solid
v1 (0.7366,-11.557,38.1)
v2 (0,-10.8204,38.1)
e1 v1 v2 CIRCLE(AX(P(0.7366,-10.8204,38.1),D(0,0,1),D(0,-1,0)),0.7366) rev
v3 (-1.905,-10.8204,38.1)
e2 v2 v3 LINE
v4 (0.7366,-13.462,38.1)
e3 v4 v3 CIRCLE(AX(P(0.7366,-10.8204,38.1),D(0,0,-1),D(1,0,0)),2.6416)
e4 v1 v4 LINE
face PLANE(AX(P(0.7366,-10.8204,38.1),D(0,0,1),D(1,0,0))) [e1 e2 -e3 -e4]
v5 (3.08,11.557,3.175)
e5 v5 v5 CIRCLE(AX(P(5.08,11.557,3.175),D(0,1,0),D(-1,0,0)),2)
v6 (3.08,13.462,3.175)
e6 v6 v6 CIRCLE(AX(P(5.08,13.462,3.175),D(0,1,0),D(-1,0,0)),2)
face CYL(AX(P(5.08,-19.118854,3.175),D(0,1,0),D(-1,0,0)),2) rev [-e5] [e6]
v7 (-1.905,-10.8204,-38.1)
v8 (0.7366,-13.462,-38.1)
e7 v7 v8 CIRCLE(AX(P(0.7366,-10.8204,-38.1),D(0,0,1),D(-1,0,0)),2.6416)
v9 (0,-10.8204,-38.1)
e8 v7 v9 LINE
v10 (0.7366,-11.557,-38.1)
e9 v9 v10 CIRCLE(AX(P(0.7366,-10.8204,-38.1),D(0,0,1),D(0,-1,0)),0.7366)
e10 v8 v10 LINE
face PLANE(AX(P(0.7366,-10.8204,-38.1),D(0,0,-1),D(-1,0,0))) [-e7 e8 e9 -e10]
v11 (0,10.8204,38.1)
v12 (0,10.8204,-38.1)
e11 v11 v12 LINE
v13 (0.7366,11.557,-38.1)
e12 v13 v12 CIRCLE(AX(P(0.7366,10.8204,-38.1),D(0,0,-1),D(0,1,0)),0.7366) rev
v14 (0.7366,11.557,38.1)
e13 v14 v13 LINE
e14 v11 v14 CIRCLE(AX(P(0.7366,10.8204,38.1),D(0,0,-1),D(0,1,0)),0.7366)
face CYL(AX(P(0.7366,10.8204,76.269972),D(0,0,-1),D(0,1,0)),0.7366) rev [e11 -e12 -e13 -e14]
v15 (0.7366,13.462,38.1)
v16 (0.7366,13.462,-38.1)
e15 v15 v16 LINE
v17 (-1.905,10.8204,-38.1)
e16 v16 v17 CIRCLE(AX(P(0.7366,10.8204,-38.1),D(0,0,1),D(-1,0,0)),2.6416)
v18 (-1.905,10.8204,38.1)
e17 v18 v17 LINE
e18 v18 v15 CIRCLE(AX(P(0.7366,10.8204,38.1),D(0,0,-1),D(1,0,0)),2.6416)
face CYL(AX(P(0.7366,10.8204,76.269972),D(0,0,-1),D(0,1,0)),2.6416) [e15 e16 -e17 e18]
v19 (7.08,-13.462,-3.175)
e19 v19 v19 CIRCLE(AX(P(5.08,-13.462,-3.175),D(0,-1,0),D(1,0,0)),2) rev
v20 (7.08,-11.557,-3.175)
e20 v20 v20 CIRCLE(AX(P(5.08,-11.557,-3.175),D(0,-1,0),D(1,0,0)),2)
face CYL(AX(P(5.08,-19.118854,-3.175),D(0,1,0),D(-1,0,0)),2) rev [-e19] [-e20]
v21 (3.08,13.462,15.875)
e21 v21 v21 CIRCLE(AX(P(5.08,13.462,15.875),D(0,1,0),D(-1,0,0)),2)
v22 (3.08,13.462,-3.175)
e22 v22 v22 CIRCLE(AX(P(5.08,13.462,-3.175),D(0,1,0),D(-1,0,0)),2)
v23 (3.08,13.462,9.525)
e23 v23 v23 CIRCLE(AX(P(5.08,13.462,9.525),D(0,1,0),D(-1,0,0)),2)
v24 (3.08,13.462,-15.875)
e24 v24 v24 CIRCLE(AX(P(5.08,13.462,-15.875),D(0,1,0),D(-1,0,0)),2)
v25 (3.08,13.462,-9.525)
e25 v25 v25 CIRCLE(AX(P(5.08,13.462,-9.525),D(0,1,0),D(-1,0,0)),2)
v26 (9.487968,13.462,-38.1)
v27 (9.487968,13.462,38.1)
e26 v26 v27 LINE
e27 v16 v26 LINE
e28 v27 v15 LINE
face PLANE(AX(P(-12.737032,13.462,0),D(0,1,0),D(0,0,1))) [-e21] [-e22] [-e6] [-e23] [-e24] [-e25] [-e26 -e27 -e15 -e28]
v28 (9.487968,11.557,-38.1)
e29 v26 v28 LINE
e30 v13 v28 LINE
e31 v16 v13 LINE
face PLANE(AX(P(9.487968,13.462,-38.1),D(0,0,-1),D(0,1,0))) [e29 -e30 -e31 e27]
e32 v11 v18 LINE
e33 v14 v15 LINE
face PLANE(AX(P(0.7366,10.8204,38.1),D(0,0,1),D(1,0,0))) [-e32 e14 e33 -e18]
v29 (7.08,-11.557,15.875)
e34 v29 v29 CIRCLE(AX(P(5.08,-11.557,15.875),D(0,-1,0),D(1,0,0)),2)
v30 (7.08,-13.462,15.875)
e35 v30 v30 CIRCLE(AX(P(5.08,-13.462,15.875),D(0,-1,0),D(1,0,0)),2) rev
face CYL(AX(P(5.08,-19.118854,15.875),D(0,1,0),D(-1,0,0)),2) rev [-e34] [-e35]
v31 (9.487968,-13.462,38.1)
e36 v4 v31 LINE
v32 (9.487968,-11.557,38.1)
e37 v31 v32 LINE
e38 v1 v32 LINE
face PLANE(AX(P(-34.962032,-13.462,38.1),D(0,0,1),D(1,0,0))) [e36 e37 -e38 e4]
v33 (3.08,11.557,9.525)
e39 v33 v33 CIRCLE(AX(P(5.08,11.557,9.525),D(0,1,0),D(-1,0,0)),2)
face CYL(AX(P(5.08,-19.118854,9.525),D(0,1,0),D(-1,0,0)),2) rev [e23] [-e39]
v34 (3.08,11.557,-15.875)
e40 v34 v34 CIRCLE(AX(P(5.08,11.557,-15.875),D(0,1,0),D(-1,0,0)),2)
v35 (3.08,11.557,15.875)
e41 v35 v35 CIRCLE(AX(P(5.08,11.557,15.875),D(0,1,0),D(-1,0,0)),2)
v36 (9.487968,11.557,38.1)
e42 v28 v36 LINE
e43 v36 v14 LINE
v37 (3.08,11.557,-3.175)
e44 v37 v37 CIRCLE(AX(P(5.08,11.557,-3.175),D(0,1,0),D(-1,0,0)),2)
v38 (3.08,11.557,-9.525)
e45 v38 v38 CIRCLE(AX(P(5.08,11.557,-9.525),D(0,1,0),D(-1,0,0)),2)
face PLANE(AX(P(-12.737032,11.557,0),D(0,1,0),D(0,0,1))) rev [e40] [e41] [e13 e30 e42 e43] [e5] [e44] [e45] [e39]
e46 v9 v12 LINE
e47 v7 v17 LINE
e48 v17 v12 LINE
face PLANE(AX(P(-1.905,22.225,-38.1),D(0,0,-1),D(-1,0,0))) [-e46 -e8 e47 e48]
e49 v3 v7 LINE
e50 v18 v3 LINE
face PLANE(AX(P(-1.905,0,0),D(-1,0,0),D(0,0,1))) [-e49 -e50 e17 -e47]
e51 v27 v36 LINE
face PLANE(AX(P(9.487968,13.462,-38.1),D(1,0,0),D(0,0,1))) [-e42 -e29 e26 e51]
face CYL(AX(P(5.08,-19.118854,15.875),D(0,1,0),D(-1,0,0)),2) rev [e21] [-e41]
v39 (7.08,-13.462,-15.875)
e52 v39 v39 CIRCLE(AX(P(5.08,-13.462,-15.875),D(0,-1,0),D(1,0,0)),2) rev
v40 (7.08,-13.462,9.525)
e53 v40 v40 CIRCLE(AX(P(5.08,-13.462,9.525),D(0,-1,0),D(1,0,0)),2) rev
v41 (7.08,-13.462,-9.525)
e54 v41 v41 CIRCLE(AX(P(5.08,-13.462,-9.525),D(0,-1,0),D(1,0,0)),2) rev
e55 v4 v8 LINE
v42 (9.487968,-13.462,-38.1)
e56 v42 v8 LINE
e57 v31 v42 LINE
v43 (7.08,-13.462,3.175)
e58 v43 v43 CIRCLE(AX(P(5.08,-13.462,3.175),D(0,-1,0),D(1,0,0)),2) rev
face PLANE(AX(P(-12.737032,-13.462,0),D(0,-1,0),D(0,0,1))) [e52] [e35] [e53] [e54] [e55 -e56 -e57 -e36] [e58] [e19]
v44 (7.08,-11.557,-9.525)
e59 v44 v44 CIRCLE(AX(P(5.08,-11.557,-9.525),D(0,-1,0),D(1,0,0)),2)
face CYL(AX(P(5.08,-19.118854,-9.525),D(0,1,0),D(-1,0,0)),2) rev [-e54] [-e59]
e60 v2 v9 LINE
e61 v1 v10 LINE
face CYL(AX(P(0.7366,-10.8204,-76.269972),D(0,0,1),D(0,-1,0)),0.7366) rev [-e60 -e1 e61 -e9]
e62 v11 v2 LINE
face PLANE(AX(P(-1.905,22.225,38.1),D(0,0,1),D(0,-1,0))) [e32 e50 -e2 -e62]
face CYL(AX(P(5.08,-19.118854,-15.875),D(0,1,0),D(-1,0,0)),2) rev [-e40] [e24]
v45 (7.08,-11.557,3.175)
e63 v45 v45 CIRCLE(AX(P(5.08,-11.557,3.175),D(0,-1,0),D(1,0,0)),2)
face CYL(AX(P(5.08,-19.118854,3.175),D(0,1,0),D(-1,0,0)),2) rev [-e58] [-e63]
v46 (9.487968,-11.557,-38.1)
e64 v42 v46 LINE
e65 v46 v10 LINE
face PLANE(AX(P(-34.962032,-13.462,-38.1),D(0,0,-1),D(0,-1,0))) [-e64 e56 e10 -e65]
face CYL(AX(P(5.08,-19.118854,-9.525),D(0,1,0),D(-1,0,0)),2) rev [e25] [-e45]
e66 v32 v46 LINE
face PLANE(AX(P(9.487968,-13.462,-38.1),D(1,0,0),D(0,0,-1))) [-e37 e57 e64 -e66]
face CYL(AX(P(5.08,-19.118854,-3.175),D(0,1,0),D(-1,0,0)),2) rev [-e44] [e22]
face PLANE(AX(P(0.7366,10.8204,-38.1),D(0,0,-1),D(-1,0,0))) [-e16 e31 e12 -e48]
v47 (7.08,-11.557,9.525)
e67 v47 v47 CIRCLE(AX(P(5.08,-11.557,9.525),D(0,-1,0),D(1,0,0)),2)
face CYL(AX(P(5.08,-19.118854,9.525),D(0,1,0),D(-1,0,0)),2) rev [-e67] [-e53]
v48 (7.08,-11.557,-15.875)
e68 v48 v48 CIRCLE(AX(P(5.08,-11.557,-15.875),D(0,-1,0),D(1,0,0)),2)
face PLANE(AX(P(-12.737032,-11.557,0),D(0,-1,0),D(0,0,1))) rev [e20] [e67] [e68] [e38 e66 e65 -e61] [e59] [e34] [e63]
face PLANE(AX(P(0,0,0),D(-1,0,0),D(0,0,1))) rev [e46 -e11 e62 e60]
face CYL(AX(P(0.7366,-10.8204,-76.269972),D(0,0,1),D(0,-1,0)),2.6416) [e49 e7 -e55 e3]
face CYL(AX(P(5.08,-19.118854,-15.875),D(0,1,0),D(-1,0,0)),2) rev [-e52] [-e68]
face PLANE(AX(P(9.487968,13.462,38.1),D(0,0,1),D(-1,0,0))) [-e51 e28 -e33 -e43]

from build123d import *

# Parameters (mm, degrees)
SKETCH4_W              = 76.2
SKETCH4_H              = 44.45
BASE_FLANGE1_DEPTH     = 1.905
SKETCHED_START         = -38.1
SKETCHED_BEND3_DEPTH   = 76.2
SKETCHED_BEND3_2_DEPTH = 76.2
CUT_EXTRUDE2_REACH     = 49.608
SKETCH20_R             = 2


# Read off the part's stored shape, not the designer's step: Sketched Bend3
# Sheet-metal steps are written as plain solids
with BuildPart() as part:
    # Sketch4 → Base-Flange1 (new body)
    with BuildSketch(Plane(origin=(0, 0, 0), x_dir=(0, 0, -1), z_dir=(1, 0, 0))):
        Rectangle(SKETCH4_W, SKETCH4_H)
    extrude(amount=-BASE_FLANGE1_DEPTH)

    # Sketched Bend3 outline → Sketched Bend3 (cut)
    with BuildSketch(Plane.XY.offset(SKETCHED_START)):
        with BuildLine():
            ThreePointArc((0, -13.357223013), (-1.375727285, -12.406629491), (-1.905, -10.8204))
            Line((-1.905, -10.8204), (-1.905, -22.225))
            Line((-1.905, -22.225), (0, -22.225))
            Line((0, -22.225), (0, -13.357223013))
        make_face()
        with BuildLine():
            Line((-1.905, 22.225), (-1.905, 10.8204))
            ThreePointArc((-1.905, 10.8204), (-1.375727285, 12.406629491), (0, 13.357223013))
            Line((0, 13.357223013), (0, 22.225))
            Line((0, 22.225), (-1.905, 22.225))
        make_face()
    extrude(amount=SKETCHED_BEND3_DEPTH, mode=Mode.SUBTRACT)

    # Sketched Bend3 2 outline → Sketched Bend3 2 (add)
    with BuildSketch(Plane.XY.offset(SKETCHED_START)):
        with BuildLine():
            Line((0, -10.8204), (0, -13.357223013))
            ThreePointArc((0, -13.357223013), (0.364592683, -13.435674577), (0.7366, -13.462))
            Line((0.7366, -13.462), (9.487967924, -13.462))
            Line((9.487967924, -13.462), (9.487967924, -11.557))
            Line((9.487967924, -11.557), (0.7366, -11.557))
            ThreePointArc((0.7366, -11.557), (0.215745145, -11.341254855), (0, -10.8204))
        make_face()
        with BuildLine():
            ThreePointArc((0.7366, 13.462), (0.364592683, 13.435674577), (0, 13.357223013))
            Line((0, 13.357223013), (0, 10.8204))
            ThreePointArc((0, 10.8204), (0.215745145, 11.341254855), (0.7366, 11.557))
            Line((0.7366, 11.557), (9.487967924, 11.557))
            Line((9.487967924, 11.557), (9.487967924, 13.462))
            Line((9.487967924, 13.462), (0.7366, 13.462))
        make_face()
    extrude(amount=SKETCHED_BEND3_2_DEPTH)

    # Cut-Extrude2: up to this face of the body (flat: up to its plane)
    cut_extrude2_end = Plane(part.part.faces().sort_by_distance((5.112283962, -13.462, 0))[0])
    # Sketch20 → Cut-Extrude2 (cut, up to the picked face)
    with BuildSketch(Plane(origin=(0, 13.462, 0), x_dir=(1, 0, 0), z_dir=(0, 1, 0)), mode=Mode.PRIVATE) as cut_extrude2_sk1:
        with Locations(Location((5.08, -3.175, 0), (0, 0, 180))):
            Circle(SKETCH20_R)
    cut_extrude2_tool1 = split(extrude(cut_extrude2_sk1.sketch, amount=-CUT_EXTRUDE2_REACH, mode=Mode.PRIVATE), bisect_by=cut_extrude2_end, keep=Keep.BOTH, mode=Mode.PRIVATE)
    # Sketch20 → Cut-Extrude2 (cut, up to the picked face)
    with BuildSketch(Plane(origin=(0, 13.462, 0), x_dir=(1, 0, 0), z_dir=(0, 1, 0)), mode=Mode.PRIVATE) as cut_extrude2_sk2:
        with Locations(Location((5.08, 3.175, 0), (0, 0, 180))):
            Circle(SKETCH20_R)
    cut_extrude2_tool2 = split(extrude(cut_extrude2_sk2.sketch, amount=-CUT_EXTRUDE2_REACH, mode=Mode.PRIVATE), bisect_by=cut_extrude2_end, keep=Keep.BOTH, mode=Mode.PRIVATE)
    # Sketch20 → Cut-Extrude2 (cut, up to the picked face)
    with BuildSketch(Plane(origin=(0, 13.462, 0), x_dir=(1, 0, 0), z_dir=(0, 1, 0)), mode=Mode.PRIVATE) as cut_extrude2_sk3:
        with Locations(Location((5.08, 9.525, 0), (0, 0, 180))):
            Circle(SKETCH20_R)
    cut_extrude2_tool3 = split(extrude(cut_extrude2_sk3.sketch, amount=-CUT_EXTRUDE2_REACH, mode=Mode.PRIVATE), bisect_by=cut_extrude2_end, keep=Keep.BOTH, mode=Mode.PRIVATE)
    # Sketch20 → Cut-Extrude2 (cut, up to the picked face)
    with BuildSketch(Plane(origin=(0, 13.462, 0), x_dir=(1, 0, 0), z_dir=(0, 1, 0)), mode=Mode.PRIVATE) as cut_extrude2_sk4:
        with Locations(Location((5.08, 15.875, 0), (0, 0, 180))):
            Circle(SKETCH20_R)
    cut_extrude2_tool4 = split(extrude(cut_extrude2_sk4.sketch, amount=-CUT_EXTRUDE2_REACH, mode=Mode.PRIVATE), bisect_by=cut_extrude2_end, keep=Keep.BOTH, mode=Mode.PRIVATE)
    # Sketch20 → Cut-Extrude2 (cut, up to the picked face)
    with BuildSketch(Plane(origin=(0, 13.462, 0), x_dir=(1, 0, 0), z_dir=(0, 1, 0)), mode=Mode.PRIVATE) as cut_extrude2_sk5:
        with Locations(Location((5.08, -9.525, 0), (0, 0, 180))):
            Circle(SKETCH20_R)
    cut_extrude2_tool5 = split(extrude(cut_extrude2_sk5.sketch, amount=-CUT_EXTRUDE2_REACH, mode=Mode.PRIVATE), bisect_by=cut_extrude2_end, keep=Keep.BOTH, mode=Mode.PRIVATE)
    # Sketch20 → Cut-Extrude2 (cut, up to the picked face)
    with BuildSketch(Plane(origin=(0, 13.462, 0), x_dir=(1, 0, 0), z_dir=(0, 1, 0)), mode=Mode.PRIVATE) as cut_extrude2_sk6:
        with Locations(Location((5.08, -15.875, 0), (0, 0, 180))):
            Circle(SKETCH20_R)
    cut_extrude2_tool6 = split(extrude(cut_extrude2_sk6.sketch, amount=-CUT_EXTRUDE2_REACH, mode=Mode.PRIVATE), bisect_by=cut_extrude2_end, keep=Keep.BOTH, mode=Mode.PRIVATE)
    add(cut_extrude2_tool1.solids().sort_by(Axis((5.08, 13.462, 3.175), (0, -1, 0)))[0], mode=Mode.SUBTRACT)
    add(cut_extrude2_tool2.solids().sort_by(Axis((5.08, 13.462, -3.175), (0, -1, 0)))[0], mode=Mode.SUBTRACT)
    add(cut_extrude2_tool3.solids().sort_by(Axis((5.08, 13.462, -9.525), (0, -1, 0)))[0], mode=Mode.SUBTRACT)
    add(cut_extrude2_tool4.solids().sort_by(Axis((5.08, 13.462, -15.875), (0, -1, 0)))[0], mode=Mode.SUBTRACT)
    add(cut_extrude2_tool5.solids().sort_by(Axis((5.08, 13.462, 9.525), (0, -1, 0)))[0], mode=Mode.SUBTRACT)
    add(cut_extrude2_tool6.solids().sort_by(Axis((5.08, 13.462, 15.875), (0, -1, 0)))[0], mode=Mode.SUBTRACT)


solid = part.part
